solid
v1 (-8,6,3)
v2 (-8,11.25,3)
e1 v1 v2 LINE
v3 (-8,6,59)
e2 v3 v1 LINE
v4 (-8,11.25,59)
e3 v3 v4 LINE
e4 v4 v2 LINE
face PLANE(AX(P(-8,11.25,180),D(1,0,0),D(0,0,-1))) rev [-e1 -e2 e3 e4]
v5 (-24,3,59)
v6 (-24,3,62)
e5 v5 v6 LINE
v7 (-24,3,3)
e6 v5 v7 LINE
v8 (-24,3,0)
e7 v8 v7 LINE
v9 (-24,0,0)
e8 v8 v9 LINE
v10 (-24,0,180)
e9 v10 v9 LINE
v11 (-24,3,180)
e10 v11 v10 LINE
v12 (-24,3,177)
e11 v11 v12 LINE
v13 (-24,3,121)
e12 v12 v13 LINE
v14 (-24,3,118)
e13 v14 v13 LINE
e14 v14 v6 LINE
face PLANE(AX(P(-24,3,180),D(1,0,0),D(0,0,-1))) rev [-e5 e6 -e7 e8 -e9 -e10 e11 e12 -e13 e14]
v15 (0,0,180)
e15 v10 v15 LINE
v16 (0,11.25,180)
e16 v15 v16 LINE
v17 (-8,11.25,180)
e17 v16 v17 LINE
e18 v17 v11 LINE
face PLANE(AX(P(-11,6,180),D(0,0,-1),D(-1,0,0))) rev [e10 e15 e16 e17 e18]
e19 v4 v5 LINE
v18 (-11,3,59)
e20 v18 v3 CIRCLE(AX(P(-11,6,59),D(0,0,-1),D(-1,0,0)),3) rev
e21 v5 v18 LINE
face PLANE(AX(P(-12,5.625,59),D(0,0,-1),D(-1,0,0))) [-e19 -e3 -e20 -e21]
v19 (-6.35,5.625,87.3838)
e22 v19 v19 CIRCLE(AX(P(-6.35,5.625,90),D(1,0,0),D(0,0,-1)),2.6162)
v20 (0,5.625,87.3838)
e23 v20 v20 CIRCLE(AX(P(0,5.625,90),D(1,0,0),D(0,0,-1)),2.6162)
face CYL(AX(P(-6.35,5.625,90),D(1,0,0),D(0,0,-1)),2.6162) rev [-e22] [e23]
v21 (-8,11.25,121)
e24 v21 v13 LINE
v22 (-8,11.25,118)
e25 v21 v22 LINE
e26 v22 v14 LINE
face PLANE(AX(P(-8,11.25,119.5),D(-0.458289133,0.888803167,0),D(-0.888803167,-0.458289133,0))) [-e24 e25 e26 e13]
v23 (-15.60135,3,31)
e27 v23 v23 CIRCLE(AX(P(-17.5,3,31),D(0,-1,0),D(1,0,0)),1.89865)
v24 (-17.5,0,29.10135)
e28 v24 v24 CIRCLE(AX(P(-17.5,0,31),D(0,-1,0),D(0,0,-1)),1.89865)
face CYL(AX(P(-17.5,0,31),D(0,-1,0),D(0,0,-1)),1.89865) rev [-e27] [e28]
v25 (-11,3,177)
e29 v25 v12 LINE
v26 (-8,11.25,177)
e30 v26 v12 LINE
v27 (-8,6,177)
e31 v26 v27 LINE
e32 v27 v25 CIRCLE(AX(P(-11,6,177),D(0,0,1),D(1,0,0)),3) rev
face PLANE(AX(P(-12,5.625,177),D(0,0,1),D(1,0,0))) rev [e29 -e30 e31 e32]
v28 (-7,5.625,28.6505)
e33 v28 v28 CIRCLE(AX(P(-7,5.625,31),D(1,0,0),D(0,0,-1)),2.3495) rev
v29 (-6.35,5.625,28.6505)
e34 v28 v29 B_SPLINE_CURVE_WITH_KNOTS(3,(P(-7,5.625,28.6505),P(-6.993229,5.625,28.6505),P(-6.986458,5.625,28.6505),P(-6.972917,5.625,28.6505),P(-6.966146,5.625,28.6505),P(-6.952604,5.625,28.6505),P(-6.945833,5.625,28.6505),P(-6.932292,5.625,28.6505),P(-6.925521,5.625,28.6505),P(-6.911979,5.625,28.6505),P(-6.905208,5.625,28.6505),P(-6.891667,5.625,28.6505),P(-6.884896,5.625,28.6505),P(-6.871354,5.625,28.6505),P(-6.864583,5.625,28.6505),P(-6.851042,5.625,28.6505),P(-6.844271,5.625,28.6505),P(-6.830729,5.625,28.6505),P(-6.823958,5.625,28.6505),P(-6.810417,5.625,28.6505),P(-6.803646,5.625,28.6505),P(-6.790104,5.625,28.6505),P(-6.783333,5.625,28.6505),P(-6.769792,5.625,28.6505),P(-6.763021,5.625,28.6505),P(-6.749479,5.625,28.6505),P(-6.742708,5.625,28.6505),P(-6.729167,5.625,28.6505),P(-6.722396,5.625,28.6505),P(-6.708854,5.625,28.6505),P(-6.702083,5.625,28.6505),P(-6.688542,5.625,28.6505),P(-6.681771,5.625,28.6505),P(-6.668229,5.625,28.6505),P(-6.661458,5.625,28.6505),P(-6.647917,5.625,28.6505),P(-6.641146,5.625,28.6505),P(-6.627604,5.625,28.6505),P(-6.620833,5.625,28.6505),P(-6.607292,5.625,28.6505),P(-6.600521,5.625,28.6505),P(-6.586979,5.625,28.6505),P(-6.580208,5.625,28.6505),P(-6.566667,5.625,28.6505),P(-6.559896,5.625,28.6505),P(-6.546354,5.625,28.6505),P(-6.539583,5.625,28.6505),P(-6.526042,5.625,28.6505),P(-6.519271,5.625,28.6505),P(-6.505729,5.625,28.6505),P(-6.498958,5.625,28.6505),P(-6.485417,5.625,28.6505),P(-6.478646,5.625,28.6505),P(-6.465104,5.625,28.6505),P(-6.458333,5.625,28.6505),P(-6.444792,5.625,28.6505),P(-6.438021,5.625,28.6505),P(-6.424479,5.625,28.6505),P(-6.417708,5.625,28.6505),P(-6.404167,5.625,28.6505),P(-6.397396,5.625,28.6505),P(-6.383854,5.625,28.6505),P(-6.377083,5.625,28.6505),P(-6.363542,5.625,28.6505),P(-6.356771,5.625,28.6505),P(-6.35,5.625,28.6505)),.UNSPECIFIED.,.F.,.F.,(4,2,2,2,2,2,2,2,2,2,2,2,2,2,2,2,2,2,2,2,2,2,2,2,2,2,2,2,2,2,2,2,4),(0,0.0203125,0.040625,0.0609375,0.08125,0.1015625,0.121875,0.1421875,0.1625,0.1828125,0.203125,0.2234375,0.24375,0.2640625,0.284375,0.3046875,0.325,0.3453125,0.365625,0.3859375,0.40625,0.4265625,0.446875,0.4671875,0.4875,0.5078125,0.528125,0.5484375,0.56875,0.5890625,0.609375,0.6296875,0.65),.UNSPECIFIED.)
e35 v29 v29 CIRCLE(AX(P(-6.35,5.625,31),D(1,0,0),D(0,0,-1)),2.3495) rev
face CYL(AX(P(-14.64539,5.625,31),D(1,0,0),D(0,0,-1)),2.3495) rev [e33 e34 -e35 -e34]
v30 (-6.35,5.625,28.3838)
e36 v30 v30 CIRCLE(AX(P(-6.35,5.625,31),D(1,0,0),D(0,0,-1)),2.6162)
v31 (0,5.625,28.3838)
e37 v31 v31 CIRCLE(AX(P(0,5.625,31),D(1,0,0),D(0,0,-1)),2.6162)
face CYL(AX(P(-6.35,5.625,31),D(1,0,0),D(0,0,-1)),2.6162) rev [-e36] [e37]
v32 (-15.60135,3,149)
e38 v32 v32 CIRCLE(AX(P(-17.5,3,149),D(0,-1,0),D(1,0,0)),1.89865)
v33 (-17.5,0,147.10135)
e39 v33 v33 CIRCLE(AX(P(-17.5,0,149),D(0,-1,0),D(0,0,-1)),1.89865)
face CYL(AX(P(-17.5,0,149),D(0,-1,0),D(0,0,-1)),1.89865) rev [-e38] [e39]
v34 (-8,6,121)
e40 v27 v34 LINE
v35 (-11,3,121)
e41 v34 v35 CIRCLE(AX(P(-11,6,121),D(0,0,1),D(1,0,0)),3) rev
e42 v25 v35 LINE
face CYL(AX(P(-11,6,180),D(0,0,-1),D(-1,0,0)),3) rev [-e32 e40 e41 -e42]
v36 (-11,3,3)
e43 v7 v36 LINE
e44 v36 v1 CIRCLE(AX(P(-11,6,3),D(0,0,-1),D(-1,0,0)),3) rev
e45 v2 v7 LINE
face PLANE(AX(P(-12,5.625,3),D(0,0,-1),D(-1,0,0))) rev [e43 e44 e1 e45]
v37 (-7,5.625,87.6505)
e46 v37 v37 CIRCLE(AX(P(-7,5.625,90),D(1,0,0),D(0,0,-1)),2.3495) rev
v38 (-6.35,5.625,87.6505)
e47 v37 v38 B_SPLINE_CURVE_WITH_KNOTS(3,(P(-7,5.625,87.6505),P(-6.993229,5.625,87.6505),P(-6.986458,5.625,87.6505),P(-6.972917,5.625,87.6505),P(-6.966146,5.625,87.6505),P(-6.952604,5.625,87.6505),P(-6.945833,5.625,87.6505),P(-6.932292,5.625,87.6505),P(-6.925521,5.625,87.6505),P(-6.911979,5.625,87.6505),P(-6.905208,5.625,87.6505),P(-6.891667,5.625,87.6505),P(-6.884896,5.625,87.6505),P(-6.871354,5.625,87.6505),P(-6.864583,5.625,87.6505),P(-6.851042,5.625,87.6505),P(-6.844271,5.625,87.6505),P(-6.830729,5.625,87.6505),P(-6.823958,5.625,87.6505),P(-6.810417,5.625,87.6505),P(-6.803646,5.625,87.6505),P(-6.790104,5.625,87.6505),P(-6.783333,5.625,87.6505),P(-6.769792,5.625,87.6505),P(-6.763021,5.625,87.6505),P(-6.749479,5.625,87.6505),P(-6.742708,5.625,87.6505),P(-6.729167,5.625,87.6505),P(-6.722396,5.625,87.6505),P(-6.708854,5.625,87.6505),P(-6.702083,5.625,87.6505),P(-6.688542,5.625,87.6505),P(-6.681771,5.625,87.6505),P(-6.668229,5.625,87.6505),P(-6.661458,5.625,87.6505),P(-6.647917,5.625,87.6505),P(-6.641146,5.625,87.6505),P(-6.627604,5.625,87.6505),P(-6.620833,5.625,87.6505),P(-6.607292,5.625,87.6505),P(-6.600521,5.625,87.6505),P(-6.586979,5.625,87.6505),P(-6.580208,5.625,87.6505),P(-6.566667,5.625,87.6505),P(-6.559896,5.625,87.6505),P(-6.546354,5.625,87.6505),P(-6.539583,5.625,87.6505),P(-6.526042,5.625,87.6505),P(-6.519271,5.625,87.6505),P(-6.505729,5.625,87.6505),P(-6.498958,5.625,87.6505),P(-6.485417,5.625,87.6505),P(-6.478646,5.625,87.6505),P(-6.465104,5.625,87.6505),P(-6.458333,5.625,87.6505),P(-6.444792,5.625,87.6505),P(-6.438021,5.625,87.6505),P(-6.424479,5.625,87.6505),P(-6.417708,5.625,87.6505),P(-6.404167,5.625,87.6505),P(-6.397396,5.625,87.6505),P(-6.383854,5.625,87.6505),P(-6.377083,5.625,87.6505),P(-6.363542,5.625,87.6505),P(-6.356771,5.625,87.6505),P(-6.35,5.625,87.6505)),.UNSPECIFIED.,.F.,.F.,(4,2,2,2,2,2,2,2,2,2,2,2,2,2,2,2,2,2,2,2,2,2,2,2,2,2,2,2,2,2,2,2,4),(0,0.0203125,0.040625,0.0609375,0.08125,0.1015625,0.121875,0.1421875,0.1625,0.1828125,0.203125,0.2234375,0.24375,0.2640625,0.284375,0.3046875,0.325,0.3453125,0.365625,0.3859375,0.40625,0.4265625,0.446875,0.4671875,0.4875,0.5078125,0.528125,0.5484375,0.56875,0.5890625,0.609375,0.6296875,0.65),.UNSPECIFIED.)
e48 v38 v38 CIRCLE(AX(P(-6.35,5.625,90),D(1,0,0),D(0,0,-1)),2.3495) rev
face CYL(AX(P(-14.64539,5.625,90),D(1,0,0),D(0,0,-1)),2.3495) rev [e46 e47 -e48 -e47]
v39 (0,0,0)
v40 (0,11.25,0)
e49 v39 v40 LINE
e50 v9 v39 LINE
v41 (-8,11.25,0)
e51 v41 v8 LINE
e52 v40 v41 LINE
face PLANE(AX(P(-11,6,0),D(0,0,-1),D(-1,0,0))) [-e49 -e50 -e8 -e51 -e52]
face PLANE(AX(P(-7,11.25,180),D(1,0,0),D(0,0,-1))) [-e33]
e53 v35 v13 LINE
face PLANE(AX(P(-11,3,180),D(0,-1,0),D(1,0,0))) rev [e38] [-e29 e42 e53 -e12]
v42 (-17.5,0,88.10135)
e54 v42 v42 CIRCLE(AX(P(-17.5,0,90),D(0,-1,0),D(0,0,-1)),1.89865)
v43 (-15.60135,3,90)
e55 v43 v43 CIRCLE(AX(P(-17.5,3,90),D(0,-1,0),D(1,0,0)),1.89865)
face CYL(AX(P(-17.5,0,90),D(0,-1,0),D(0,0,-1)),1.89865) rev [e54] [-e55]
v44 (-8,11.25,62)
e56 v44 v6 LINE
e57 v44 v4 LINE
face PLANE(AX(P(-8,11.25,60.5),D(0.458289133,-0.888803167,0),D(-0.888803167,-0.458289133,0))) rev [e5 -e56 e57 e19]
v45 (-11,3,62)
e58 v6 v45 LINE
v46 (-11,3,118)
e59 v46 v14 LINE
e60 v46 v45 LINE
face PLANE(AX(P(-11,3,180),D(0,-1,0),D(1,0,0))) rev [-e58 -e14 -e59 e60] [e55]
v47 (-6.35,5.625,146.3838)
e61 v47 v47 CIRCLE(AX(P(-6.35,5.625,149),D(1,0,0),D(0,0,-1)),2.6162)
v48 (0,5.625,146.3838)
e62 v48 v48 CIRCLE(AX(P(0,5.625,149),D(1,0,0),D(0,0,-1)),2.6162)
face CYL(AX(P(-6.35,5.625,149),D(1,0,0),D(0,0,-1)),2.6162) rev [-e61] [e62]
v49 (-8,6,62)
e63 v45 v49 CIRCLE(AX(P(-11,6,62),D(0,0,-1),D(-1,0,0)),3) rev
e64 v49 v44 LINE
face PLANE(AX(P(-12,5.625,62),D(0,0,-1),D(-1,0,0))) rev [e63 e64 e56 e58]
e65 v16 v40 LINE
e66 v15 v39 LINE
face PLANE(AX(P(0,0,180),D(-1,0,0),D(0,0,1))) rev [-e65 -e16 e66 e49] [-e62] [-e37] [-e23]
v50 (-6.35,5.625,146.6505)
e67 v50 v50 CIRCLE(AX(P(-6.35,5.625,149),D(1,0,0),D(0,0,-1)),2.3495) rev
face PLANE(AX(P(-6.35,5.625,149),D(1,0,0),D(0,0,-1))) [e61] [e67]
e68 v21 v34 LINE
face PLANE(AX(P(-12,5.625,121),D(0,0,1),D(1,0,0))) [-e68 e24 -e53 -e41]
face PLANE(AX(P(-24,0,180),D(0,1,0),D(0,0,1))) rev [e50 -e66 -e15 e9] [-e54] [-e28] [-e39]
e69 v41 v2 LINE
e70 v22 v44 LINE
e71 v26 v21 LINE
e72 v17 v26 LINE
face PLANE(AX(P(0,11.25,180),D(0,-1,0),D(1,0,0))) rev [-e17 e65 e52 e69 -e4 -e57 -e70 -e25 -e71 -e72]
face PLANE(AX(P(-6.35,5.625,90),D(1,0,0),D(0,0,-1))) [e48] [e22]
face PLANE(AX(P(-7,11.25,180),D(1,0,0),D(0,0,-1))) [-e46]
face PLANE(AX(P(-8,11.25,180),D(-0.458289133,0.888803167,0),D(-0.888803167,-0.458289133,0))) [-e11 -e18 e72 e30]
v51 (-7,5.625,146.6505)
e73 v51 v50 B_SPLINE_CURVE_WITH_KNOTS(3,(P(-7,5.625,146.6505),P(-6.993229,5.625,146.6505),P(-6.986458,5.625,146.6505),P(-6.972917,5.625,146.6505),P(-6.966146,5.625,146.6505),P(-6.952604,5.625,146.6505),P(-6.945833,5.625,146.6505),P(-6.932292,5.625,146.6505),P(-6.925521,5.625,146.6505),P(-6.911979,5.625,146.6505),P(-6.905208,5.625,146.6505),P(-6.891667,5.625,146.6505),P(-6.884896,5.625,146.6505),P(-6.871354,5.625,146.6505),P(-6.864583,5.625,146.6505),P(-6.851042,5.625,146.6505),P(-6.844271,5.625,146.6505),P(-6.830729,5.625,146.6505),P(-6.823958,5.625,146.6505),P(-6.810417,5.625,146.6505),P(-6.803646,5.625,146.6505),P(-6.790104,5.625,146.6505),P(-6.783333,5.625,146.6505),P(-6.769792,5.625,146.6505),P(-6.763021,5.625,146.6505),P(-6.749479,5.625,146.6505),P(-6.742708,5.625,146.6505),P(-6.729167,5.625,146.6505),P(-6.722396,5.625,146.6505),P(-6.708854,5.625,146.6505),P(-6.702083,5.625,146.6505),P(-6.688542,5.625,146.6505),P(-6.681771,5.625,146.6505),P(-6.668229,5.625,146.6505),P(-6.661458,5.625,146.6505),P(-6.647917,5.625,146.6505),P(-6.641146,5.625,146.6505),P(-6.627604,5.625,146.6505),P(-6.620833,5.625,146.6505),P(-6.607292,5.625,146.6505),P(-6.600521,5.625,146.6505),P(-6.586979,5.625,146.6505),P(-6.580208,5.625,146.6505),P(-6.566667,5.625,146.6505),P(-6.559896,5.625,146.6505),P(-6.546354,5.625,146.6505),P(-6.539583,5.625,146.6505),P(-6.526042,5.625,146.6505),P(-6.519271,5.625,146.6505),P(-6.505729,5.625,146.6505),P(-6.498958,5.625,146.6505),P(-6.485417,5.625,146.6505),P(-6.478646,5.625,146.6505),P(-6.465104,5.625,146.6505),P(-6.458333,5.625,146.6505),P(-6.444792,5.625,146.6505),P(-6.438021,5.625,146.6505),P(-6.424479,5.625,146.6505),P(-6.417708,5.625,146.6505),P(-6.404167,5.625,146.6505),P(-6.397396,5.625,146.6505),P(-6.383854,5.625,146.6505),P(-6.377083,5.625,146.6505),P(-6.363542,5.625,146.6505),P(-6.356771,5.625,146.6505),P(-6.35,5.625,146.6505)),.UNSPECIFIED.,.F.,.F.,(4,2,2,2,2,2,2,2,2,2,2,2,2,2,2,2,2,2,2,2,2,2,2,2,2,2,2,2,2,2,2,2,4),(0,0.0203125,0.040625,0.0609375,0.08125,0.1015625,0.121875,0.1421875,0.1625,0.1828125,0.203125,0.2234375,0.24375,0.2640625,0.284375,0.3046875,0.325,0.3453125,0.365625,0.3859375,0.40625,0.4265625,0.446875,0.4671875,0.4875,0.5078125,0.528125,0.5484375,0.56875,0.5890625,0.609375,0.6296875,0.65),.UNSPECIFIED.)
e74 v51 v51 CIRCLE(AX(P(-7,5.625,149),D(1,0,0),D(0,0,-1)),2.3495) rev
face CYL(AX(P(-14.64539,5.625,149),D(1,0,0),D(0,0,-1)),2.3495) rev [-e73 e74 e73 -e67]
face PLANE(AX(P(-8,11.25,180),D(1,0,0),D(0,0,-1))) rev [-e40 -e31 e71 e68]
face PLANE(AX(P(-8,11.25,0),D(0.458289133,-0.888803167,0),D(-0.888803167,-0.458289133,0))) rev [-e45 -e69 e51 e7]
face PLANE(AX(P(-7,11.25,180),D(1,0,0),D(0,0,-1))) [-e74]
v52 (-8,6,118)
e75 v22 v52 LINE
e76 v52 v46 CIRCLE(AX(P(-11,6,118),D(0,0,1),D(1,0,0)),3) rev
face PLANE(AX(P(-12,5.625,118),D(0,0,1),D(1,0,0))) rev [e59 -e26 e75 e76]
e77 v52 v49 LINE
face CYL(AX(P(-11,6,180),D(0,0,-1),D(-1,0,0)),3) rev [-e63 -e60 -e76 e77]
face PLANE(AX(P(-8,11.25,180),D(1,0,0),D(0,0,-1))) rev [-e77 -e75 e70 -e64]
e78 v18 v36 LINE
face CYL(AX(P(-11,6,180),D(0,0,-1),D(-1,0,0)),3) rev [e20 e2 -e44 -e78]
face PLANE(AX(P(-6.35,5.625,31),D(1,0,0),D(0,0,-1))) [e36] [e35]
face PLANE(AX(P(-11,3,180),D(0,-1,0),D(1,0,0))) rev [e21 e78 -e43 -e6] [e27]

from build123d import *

# Parameters (mm, degrees)
BOSS_EXTRUDE1_DEPTH   = 180
RIB3_REACH            = 124.404
SKETCH4_WALL_W        = 264.810334732
SKETCH4_WALL_H        = 3
RIB4_START            = -3
RIB4_DEPTH            = 3
F_6_CLEARANCE_HOLE1_D = 3.7973
SKETCH6_R             = 2.3495
CUT_EXTRUDE1_DEPTH    = 7
SKETCH12_R            = 2.6162
CUT_EXTRUDE2_DEPTH    = 6.35


# Read off the part's stored shape, not the designer's step: Rib4
with BuildPart() as part:
    # Sketch1 → Boss-Extrude1 (new body)
    with BuildSketch(Plane.XY):
        with BuildLine():
            Line((0, 0), (0, 11.25))
            Line((0, 11.25), (-8, 11.25))
            Line((-8, 11.25), (-8, 6))
            ThreePointArc((-8, 6), (-8.878679656, 3.878679656), (-11, 3))
            Line((-11, 3), (-24, 3))
            Line((-24, 3), (-24, 0))
            Line((-24, 0), (0, 0))
        make_face()
    extrude(amount=BOSS_EXTRUDE1_DEPTH)

    # Sketch4 wall → Rib3 (add, up to next)
    with BuildSketch(Plane(origin=(-16, 7.125, 60.5), x_dir=(-0.888803167408, -0.458289133195, 0), z_dir=(-0.458289133195, 0.888803167408, 0)), mode=Mode.PRIVATE) as rib3_sk1:
        Rectangle(SKETCH4_WALL_W, SKETCH4_WALL_H)
    rib3_tool1 = extrude(rib3_sk1.sketch, amount=-RIB3_REACH, mode=Mode.PRIVATE) - part.part
    rib3 = rib3_tool1.solids().sort_by_distance((-16, 7.125, 60.5))[0]
    add(rib3)

    # Rib4 outline → Rib4 (add)
    with BuildSketch(Plane(origin=(0, 0, 0), x_dir=(-1, 0, 0), z_dir=(0, 0, -1)).offset(RIB4_START)):
        with BuildLine():
            Line((24, 3), (8, 11.25))
            Line((8, 11.25), (8, 6))
            ThreePointArc((8, 6), (8.878679656, 3.878679656), (11, 3))
            Line((11, 3), (24, 3))
        make_face()
    rib4 = extrude(amount=RIB4_DEPTH)

    # Mirror1: Rib3, Rib4 across plane
    add(rib3.mirror(Plane(origin=(0, 0, 90), x_dir=(1, 0, 0), z_dir=(0, 0, -1))))
    add(rib4.mirror(Plane(origin=(0, 0, 90), x_dir=(1, 0, 0), z_dir=(0, 0, -1))))

    # #6 Clearance Hole1 (through all)
    with Locations(Plane(origin=(0, 0, 0), x_dir=(-1, 0, 0), z_dir=(0, -1, 0))):
        with Locations((17.5, -31), (17.5, -149), (17.5, -90)):
            Hole(F_6_CLEARANCE_HOLE1_D / 2)

    # Sketch6 → Cut-Extrude1 (cut)
    with BuildSketch(Plane(origin=(0, 0, 0), x_dir=(0, 0, -1), z_dir=(1, 0, 0))):
        with Locations((-149, 5.625)):
            Circle(SKETCH6_R)
        with Locations((-31, 5.625)):
            Circle(SKETCH6_R)
        with Locations((-90, 5.625)):
            Circle(SKETCH6_R)
    extrude(amount=-CUT_EXTRUDE1_DEPTH, mode=Mode.SUBTRACT)

    # Sketch12 → Cut-Extrude2 (cut)
    with BuildSketch(Plane(origin=(0, 0, 0), x_dir=(0, 0, -1), z_dir=(1, 0, 0))):
        with Locations((-149, 5.625)):
            Circle(SKETCH12_R)
        with Locations((-31, 5.625)):
            Circle(SKETCH12_R)
        with Locations((-90, 5.625)):
            Circle(SKETCH12_R)
    extrude(amount=-CUT_EXTRUDE2_DEPTH, mode=Mode.SUBTRACT)


solid = part.part
